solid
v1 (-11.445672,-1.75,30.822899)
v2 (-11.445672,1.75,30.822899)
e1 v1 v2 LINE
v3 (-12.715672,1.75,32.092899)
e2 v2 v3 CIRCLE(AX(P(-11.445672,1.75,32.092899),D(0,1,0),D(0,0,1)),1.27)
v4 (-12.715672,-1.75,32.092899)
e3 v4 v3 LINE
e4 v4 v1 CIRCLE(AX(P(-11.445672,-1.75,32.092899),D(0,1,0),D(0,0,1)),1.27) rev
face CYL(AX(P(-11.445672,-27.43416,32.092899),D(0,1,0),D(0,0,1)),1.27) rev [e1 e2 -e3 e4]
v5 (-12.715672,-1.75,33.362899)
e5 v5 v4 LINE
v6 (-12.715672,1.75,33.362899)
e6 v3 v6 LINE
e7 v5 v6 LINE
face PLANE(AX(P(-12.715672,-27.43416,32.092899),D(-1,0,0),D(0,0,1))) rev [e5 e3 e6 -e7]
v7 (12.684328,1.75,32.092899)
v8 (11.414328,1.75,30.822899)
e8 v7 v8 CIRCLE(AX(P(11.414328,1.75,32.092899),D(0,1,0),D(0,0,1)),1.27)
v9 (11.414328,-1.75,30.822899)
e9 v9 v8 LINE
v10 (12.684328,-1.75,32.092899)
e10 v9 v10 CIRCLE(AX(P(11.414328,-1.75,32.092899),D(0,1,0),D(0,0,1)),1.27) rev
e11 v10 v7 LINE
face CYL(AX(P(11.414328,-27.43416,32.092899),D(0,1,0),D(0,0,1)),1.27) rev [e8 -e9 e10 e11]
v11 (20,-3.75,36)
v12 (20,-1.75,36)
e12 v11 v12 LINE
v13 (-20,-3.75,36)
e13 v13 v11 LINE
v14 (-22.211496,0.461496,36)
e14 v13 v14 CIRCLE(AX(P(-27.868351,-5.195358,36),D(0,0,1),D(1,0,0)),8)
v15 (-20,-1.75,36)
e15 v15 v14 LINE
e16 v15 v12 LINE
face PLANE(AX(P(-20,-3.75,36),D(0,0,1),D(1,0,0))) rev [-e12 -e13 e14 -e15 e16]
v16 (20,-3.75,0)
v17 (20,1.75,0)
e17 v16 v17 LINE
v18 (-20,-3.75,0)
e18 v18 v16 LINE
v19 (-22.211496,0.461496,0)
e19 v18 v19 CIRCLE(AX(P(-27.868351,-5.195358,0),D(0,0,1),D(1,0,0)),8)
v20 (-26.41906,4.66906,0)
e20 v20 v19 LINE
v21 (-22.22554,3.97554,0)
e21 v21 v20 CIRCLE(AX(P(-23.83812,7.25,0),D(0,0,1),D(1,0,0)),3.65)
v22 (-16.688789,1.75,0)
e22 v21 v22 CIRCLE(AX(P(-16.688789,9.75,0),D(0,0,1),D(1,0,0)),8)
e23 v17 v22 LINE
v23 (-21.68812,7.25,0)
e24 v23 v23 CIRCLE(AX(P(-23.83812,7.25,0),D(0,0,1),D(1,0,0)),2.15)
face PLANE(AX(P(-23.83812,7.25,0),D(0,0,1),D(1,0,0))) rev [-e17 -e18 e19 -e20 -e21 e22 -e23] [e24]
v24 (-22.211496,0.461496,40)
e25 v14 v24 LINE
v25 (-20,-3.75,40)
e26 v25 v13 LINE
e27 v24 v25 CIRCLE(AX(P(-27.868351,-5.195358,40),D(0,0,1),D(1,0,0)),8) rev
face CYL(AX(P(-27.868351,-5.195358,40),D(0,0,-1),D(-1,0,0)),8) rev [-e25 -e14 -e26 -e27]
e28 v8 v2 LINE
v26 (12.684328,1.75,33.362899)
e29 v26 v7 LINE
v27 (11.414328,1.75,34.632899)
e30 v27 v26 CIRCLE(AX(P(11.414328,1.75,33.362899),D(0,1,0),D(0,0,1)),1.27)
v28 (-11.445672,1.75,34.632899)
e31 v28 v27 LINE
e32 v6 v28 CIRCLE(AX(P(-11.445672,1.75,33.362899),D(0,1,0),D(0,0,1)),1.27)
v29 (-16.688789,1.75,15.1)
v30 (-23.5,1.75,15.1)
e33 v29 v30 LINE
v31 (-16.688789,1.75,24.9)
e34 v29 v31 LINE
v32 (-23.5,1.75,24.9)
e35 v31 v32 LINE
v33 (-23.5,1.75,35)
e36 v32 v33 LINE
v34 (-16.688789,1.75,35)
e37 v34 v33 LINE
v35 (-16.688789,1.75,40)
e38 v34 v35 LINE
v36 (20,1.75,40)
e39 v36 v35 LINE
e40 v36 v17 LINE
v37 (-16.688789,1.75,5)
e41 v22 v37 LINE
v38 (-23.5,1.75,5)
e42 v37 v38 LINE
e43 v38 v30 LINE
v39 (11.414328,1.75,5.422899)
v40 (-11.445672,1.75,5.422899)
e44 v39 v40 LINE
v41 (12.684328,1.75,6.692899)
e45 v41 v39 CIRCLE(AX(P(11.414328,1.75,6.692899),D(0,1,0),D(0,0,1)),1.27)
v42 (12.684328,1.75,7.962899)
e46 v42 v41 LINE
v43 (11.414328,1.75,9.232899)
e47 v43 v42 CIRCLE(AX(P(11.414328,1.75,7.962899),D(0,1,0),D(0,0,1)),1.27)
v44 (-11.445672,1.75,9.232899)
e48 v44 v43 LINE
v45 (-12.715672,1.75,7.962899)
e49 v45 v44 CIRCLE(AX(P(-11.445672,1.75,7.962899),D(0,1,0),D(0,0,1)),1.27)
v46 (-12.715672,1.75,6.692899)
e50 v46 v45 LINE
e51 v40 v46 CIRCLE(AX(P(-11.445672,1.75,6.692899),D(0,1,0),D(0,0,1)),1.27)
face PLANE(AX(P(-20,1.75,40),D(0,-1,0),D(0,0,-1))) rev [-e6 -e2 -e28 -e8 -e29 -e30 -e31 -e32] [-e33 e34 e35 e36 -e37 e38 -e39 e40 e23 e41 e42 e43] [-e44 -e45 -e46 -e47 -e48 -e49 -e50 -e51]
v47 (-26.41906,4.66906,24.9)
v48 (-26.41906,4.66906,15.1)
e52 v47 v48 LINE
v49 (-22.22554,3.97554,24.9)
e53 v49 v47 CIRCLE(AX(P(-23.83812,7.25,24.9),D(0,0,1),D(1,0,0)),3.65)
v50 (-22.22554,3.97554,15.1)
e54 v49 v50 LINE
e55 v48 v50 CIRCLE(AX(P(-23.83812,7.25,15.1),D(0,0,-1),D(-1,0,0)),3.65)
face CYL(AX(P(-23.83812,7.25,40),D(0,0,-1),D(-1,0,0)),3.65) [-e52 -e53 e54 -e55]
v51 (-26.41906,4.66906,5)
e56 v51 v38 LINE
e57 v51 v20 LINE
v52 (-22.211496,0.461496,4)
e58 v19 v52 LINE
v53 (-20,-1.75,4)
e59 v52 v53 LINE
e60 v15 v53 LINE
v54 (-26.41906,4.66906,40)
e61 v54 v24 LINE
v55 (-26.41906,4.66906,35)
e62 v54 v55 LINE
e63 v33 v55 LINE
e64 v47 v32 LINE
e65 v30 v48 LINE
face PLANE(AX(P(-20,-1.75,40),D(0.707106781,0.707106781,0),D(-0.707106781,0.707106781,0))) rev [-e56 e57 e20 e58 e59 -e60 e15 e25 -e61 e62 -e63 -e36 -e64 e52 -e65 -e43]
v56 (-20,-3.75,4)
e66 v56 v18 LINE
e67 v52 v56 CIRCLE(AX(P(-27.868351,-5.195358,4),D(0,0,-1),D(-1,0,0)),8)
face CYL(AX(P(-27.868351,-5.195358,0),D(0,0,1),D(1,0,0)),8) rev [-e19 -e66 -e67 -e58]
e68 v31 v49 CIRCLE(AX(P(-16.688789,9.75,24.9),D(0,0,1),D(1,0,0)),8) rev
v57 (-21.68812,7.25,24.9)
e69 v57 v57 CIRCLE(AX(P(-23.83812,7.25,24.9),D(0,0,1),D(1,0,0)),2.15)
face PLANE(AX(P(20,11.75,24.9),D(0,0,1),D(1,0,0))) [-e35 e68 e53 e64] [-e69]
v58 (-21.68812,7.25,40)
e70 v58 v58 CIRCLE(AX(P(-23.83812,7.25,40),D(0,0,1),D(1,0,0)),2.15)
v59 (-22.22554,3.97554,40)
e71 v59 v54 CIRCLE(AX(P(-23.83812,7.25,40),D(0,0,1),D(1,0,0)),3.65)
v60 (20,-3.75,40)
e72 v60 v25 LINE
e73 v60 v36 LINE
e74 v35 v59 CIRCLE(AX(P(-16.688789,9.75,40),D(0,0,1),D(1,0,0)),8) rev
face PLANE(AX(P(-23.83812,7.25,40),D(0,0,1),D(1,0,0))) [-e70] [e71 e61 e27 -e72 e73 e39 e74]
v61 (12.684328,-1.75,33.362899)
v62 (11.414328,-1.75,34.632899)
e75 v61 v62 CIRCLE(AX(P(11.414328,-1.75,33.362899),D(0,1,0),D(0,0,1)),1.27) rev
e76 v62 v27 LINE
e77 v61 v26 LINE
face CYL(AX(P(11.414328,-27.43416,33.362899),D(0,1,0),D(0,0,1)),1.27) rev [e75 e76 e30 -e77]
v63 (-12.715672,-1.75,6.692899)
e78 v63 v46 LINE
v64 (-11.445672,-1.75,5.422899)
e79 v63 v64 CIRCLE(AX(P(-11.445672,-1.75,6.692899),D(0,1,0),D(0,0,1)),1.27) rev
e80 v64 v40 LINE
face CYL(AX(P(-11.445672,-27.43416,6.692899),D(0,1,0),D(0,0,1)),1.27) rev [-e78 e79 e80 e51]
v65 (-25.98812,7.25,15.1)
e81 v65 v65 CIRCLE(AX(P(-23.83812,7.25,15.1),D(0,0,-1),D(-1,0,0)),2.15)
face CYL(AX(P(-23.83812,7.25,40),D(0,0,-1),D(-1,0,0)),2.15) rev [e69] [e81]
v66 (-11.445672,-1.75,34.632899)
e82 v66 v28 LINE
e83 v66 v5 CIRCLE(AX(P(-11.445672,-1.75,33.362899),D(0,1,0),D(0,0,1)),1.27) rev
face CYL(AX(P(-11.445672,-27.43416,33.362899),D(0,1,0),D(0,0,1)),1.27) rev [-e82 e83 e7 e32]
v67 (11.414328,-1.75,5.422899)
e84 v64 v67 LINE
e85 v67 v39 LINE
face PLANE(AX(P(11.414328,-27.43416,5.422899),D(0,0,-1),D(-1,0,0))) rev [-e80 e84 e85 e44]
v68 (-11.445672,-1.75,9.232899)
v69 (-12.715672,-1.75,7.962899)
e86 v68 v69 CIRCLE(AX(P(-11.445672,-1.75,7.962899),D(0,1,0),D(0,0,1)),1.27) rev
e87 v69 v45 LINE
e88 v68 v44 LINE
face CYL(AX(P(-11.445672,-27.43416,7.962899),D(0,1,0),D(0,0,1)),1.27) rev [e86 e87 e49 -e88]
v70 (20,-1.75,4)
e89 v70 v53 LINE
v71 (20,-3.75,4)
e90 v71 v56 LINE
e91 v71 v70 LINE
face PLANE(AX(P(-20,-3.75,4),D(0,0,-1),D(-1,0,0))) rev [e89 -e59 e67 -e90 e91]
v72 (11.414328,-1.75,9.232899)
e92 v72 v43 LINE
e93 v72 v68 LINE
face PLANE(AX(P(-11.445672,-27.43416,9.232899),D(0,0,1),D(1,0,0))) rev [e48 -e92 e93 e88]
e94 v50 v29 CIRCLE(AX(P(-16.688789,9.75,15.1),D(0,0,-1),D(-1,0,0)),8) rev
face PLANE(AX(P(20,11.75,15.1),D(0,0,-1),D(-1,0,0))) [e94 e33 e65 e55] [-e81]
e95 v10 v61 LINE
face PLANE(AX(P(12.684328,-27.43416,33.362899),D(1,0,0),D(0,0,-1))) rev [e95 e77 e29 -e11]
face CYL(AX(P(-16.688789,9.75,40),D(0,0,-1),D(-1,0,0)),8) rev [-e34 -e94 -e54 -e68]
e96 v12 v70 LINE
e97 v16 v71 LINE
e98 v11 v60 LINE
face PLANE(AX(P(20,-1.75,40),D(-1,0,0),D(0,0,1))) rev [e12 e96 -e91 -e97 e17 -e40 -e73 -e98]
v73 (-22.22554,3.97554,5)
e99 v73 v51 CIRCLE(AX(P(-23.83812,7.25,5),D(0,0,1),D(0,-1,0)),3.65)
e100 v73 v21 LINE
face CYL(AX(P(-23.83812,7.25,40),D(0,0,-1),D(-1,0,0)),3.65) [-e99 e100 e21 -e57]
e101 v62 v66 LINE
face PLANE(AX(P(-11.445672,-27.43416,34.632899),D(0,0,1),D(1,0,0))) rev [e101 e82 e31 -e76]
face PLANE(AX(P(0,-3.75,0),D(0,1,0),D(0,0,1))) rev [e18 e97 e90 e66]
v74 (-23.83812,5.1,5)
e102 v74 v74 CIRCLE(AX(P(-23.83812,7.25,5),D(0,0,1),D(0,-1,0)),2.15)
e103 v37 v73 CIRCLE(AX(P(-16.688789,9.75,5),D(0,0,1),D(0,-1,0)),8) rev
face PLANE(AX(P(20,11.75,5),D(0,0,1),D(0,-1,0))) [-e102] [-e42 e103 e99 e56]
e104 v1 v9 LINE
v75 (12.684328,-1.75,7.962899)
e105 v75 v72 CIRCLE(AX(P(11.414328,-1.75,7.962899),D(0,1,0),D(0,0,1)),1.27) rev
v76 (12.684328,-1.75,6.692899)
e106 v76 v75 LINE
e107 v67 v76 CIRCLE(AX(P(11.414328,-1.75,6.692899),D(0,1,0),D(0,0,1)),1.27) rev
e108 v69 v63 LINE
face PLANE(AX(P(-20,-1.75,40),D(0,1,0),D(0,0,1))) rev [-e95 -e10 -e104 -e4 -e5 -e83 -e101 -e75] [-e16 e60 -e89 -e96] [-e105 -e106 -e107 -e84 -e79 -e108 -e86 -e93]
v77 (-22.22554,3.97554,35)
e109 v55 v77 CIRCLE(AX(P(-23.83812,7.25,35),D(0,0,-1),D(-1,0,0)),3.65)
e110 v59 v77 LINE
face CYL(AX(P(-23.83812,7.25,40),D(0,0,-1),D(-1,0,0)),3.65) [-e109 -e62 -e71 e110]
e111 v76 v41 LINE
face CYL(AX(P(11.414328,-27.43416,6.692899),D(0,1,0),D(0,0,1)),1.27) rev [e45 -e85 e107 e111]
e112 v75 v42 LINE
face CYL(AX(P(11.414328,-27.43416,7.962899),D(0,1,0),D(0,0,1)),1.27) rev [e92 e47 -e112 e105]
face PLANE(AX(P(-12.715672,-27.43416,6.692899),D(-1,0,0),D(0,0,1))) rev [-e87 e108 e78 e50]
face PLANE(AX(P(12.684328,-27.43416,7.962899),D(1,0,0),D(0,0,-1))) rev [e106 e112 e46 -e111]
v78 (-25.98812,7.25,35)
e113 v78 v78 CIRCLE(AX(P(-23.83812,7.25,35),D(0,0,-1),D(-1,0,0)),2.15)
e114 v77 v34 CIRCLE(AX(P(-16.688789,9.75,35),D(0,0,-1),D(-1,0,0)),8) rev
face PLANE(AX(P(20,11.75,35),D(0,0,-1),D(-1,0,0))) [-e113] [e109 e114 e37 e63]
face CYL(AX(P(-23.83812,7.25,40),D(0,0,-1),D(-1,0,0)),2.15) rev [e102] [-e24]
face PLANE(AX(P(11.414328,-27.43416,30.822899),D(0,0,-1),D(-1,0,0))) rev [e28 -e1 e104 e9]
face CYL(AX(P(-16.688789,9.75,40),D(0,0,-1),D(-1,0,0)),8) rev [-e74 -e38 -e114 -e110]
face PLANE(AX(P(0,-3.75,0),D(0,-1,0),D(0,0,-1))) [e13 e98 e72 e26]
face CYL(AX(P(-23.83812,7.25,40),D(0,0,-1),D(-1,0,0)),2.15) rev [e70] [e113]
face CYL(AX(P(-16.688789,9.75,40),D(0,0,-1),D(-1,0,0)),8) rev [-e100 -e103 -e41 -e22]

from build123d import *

# Parameters (mm, degrees)
SKETCH_1_R               = 2.15
EXTRUDE_1_DEPTH          = 40
CUT_EXTRUDE_2_DEPTH      = 58.739891142
CUT_EXTRUDE_2_DEPTH_BACK = 10
SKETCH_2_W               = 10.1
SKETCH_2_H               = 10
SKETCH_4_W               = 40
SKETCH_4_H               = 4
EXTRUDE_2_DEPTH          = 2
CUT_EXTRUDE_3_DEPTH      = 3.5
FILLET_1_R               = 8


with BuildPart() as part:
    # 草图1 → 凸台-拉伸1 (new body)
    with BuildSketch(Plane.XY):
        with BuildLine():
            Line((-20, 1.75), (-22.225540425, 3.975540425))
            ThreePointArc((-22.225540425, 3.975540425), (-23.242576583, 10.851086981), (-26.419060249, 4.669060249))
            Line((-26.419060249, 4.669060249), (-20, -1.75))
            Line((-20, -1.75), (20, -1.75))
            Line((20, -1.75), (20, 1.75))
            Line((20, 1.75), (-20, 1.75))
        make_face()
        with Locations((-23.838120497, 7.25)):
            Circle(SKETCH_1_R, mode=Mode.SUBTRACT)
    extrude(amount=EXTRUDE_1_DEPTH)

    # 草图2 → 切除-拉伸2 (cut, two sides: drawn at the far end of the back side and taken through both)
    with BuildSketch(Plane(origin=(-20.188120497, 0, 0), x_dir=(0, 0, -1), z_dir=(1, 0, 0)).offset(-CUT_EXTRUDE_2_DEPTH_BACK)):
        with Locations((-29.95, 6.75)):
            Rectangle(SKETCH_2_W, SKETCH_2_H)
        with Locations((-10.05, 6.75)):
            Rectangle(SKETCH_2_W, SKETCH_2_H)
    extrude(amount=CUT_EXTRUDE_2_DEPTH + CUT_EXTRUDE_2_DEPTH_BACK, mode=Mode.SUBTRACT)

    # 草图4 → 凸台-拉伸2 (add)
    with BuildSketch(Plane.XZ.offset(1.75)):
        with Locations((0, 2)):
            Rectangle(SKETCH_4_W, SKETCH_4_H)
        with Locations((0, 38)):
            Rectangle(SKETCH_4_W, SKETCH_4_H)
    extrude(amount=EXTRUDE_2_DEPTH)

    # 草图5 → 切除-拉伸3 (cut)
    with BuildSketch(Plane(origin=(0, 1.75, 0), x_dir=(1, 0, 0), z_dir=(0, 1, 0))):
        with BuildLine():
            Line((11.414328277, -30.822898901), (-11.445671723, -30.822898901))
            ThreePointArc((-11.445671723, -30.822898901), (-12.343697335, -31.194873288), (-12.715671723, -32.092898901))
            Line((-12.715671723, -32.092898901), (-12.715671723, -33.362898901))
            ThreePointArc((-12.715671723, -33.362898901), (-12.343697335, -34.260924513), (-11.445671723, -34.632898901))
            Line((-11.445671723, -34.632898901), (11.414328277, -34.632898901))
            ThreePointArc((11.414328277, -34.632898901), (12.31235389, -34.260924513), (12.684328277, -33.362898901))
            Line((12.684328277, -33.362898901), (12.684328277, -32.092898901))
            ThreePointArc((12.684328277, -32.092898901), (12.31235389, -31.194873288), (11.414328277, -30.822898901))
        make_face()
        with BuildLine():
            Line((12.684328277, -7.962898901), (12.684328277, -6.692898901))
            ThreePointArc((12.684328277, -6.692898901), (12.31235389, -5.794873288), (11.414328277, -5.422898901))
            Line((11.414328277, -5.422898901), (-11.445671723, -5.422898901))
            ThreePointArc((-11.445671723, -5.422898901), (-12.343697335, -5.794873288), (-12.715671723, -6.692898901))
            Line((-12.715671723, -6.692898901), (-12.715671723, -7.962898901))
            ThreePointArc((-12.715671723, -7.962898901), (-12.343697335, -8.860924513), (-11.445671723, -9.232898901))
            Line((-11.445671723, -9.232898901), (11.414328277, -9.232898901))
            ThreePointArc((11.414328277, -9.232898901), (12.31235389, -8.860924513), (12.684328277, -7.962898901))
        make_face()
    extrude(amount=-CUT_EXTRUDE_3_DEPTH, mode=Mode.SUBTRACT)

    # 圆角1
    # the kernel refuses this fillet: 8 mm, written as the material it adds along each edge
    with BuildSketch(Plane(origin=(-20, -1.75, 0), x_dir=(-0.707106781186549, 0.7071067811865461, 0), z_dir=(0, 0, 1)), Plane(origin=(-20, -1.75, 36), x_dir=(-0.707106781186549, 0.7071067811865461, 0), z_dir=(0, 0, 1))) as fillet_1_piece_1:
        with BuildLine():
            CenterArc((3.127528064, 8), FILLET_1_R, 235.408772886, 34.591227114)
            Line((-1.414213562, 1.414213562), (0, 0))
            Line((0, 0), (3.127528064, 0))
        make_face()
    extrude(amount=4)
    with BuildSketch(Plane(origin=(-20, 1.75, 0), x_dir=(-0.7071067811865483, 0.7071067811865467, 0), z_dir=(0, 0, 1))) as fillet_1_piece_2:
        with BuildLine():
            CenterArc((3.31547448, -7.998234019), FILLET_1_R, 91.203908923, 43.796091077)
            Line((-2.34137977, -2.34137977), (0, 0))
            Line((0, 0), (3.147389452, 0))
        make_face()
    extrude(amount=5)
    with BuildSketch(Plane(origin=(-20, 1.75, 15.1), x_dir=(1, 0, 0), z_dir=(0, 0, 1))) as fillet_1_piece_3:
        with BuildLine():
            CenterArc((3.311211025, 8), FILLET_1_R, 226.203908923, 43.796091077)
            Line((-2.225540425, 2.225540425), (0, 0))
            Line((0, 0), (3.311211025, 0))
        make_face()
    extrude(amount=9.8)
    with BuildSketch(Plane(origin=(-20, 1.75, 35), x_dir=(1, 0, 0), z_dir=(0, 0, 1))) as fillet_1_piece_4:
        with BuildLine():
            CenterArc((3.311211025, 8), FILLET_1_R, 226.203908923, 43.796091077)
            Line((-2.225540425, 2.225540425), (0, 0))
            Line((0, 0), (3.311211025, 0))
        make_face()
    extrude(amount=5)


solid = part.part
